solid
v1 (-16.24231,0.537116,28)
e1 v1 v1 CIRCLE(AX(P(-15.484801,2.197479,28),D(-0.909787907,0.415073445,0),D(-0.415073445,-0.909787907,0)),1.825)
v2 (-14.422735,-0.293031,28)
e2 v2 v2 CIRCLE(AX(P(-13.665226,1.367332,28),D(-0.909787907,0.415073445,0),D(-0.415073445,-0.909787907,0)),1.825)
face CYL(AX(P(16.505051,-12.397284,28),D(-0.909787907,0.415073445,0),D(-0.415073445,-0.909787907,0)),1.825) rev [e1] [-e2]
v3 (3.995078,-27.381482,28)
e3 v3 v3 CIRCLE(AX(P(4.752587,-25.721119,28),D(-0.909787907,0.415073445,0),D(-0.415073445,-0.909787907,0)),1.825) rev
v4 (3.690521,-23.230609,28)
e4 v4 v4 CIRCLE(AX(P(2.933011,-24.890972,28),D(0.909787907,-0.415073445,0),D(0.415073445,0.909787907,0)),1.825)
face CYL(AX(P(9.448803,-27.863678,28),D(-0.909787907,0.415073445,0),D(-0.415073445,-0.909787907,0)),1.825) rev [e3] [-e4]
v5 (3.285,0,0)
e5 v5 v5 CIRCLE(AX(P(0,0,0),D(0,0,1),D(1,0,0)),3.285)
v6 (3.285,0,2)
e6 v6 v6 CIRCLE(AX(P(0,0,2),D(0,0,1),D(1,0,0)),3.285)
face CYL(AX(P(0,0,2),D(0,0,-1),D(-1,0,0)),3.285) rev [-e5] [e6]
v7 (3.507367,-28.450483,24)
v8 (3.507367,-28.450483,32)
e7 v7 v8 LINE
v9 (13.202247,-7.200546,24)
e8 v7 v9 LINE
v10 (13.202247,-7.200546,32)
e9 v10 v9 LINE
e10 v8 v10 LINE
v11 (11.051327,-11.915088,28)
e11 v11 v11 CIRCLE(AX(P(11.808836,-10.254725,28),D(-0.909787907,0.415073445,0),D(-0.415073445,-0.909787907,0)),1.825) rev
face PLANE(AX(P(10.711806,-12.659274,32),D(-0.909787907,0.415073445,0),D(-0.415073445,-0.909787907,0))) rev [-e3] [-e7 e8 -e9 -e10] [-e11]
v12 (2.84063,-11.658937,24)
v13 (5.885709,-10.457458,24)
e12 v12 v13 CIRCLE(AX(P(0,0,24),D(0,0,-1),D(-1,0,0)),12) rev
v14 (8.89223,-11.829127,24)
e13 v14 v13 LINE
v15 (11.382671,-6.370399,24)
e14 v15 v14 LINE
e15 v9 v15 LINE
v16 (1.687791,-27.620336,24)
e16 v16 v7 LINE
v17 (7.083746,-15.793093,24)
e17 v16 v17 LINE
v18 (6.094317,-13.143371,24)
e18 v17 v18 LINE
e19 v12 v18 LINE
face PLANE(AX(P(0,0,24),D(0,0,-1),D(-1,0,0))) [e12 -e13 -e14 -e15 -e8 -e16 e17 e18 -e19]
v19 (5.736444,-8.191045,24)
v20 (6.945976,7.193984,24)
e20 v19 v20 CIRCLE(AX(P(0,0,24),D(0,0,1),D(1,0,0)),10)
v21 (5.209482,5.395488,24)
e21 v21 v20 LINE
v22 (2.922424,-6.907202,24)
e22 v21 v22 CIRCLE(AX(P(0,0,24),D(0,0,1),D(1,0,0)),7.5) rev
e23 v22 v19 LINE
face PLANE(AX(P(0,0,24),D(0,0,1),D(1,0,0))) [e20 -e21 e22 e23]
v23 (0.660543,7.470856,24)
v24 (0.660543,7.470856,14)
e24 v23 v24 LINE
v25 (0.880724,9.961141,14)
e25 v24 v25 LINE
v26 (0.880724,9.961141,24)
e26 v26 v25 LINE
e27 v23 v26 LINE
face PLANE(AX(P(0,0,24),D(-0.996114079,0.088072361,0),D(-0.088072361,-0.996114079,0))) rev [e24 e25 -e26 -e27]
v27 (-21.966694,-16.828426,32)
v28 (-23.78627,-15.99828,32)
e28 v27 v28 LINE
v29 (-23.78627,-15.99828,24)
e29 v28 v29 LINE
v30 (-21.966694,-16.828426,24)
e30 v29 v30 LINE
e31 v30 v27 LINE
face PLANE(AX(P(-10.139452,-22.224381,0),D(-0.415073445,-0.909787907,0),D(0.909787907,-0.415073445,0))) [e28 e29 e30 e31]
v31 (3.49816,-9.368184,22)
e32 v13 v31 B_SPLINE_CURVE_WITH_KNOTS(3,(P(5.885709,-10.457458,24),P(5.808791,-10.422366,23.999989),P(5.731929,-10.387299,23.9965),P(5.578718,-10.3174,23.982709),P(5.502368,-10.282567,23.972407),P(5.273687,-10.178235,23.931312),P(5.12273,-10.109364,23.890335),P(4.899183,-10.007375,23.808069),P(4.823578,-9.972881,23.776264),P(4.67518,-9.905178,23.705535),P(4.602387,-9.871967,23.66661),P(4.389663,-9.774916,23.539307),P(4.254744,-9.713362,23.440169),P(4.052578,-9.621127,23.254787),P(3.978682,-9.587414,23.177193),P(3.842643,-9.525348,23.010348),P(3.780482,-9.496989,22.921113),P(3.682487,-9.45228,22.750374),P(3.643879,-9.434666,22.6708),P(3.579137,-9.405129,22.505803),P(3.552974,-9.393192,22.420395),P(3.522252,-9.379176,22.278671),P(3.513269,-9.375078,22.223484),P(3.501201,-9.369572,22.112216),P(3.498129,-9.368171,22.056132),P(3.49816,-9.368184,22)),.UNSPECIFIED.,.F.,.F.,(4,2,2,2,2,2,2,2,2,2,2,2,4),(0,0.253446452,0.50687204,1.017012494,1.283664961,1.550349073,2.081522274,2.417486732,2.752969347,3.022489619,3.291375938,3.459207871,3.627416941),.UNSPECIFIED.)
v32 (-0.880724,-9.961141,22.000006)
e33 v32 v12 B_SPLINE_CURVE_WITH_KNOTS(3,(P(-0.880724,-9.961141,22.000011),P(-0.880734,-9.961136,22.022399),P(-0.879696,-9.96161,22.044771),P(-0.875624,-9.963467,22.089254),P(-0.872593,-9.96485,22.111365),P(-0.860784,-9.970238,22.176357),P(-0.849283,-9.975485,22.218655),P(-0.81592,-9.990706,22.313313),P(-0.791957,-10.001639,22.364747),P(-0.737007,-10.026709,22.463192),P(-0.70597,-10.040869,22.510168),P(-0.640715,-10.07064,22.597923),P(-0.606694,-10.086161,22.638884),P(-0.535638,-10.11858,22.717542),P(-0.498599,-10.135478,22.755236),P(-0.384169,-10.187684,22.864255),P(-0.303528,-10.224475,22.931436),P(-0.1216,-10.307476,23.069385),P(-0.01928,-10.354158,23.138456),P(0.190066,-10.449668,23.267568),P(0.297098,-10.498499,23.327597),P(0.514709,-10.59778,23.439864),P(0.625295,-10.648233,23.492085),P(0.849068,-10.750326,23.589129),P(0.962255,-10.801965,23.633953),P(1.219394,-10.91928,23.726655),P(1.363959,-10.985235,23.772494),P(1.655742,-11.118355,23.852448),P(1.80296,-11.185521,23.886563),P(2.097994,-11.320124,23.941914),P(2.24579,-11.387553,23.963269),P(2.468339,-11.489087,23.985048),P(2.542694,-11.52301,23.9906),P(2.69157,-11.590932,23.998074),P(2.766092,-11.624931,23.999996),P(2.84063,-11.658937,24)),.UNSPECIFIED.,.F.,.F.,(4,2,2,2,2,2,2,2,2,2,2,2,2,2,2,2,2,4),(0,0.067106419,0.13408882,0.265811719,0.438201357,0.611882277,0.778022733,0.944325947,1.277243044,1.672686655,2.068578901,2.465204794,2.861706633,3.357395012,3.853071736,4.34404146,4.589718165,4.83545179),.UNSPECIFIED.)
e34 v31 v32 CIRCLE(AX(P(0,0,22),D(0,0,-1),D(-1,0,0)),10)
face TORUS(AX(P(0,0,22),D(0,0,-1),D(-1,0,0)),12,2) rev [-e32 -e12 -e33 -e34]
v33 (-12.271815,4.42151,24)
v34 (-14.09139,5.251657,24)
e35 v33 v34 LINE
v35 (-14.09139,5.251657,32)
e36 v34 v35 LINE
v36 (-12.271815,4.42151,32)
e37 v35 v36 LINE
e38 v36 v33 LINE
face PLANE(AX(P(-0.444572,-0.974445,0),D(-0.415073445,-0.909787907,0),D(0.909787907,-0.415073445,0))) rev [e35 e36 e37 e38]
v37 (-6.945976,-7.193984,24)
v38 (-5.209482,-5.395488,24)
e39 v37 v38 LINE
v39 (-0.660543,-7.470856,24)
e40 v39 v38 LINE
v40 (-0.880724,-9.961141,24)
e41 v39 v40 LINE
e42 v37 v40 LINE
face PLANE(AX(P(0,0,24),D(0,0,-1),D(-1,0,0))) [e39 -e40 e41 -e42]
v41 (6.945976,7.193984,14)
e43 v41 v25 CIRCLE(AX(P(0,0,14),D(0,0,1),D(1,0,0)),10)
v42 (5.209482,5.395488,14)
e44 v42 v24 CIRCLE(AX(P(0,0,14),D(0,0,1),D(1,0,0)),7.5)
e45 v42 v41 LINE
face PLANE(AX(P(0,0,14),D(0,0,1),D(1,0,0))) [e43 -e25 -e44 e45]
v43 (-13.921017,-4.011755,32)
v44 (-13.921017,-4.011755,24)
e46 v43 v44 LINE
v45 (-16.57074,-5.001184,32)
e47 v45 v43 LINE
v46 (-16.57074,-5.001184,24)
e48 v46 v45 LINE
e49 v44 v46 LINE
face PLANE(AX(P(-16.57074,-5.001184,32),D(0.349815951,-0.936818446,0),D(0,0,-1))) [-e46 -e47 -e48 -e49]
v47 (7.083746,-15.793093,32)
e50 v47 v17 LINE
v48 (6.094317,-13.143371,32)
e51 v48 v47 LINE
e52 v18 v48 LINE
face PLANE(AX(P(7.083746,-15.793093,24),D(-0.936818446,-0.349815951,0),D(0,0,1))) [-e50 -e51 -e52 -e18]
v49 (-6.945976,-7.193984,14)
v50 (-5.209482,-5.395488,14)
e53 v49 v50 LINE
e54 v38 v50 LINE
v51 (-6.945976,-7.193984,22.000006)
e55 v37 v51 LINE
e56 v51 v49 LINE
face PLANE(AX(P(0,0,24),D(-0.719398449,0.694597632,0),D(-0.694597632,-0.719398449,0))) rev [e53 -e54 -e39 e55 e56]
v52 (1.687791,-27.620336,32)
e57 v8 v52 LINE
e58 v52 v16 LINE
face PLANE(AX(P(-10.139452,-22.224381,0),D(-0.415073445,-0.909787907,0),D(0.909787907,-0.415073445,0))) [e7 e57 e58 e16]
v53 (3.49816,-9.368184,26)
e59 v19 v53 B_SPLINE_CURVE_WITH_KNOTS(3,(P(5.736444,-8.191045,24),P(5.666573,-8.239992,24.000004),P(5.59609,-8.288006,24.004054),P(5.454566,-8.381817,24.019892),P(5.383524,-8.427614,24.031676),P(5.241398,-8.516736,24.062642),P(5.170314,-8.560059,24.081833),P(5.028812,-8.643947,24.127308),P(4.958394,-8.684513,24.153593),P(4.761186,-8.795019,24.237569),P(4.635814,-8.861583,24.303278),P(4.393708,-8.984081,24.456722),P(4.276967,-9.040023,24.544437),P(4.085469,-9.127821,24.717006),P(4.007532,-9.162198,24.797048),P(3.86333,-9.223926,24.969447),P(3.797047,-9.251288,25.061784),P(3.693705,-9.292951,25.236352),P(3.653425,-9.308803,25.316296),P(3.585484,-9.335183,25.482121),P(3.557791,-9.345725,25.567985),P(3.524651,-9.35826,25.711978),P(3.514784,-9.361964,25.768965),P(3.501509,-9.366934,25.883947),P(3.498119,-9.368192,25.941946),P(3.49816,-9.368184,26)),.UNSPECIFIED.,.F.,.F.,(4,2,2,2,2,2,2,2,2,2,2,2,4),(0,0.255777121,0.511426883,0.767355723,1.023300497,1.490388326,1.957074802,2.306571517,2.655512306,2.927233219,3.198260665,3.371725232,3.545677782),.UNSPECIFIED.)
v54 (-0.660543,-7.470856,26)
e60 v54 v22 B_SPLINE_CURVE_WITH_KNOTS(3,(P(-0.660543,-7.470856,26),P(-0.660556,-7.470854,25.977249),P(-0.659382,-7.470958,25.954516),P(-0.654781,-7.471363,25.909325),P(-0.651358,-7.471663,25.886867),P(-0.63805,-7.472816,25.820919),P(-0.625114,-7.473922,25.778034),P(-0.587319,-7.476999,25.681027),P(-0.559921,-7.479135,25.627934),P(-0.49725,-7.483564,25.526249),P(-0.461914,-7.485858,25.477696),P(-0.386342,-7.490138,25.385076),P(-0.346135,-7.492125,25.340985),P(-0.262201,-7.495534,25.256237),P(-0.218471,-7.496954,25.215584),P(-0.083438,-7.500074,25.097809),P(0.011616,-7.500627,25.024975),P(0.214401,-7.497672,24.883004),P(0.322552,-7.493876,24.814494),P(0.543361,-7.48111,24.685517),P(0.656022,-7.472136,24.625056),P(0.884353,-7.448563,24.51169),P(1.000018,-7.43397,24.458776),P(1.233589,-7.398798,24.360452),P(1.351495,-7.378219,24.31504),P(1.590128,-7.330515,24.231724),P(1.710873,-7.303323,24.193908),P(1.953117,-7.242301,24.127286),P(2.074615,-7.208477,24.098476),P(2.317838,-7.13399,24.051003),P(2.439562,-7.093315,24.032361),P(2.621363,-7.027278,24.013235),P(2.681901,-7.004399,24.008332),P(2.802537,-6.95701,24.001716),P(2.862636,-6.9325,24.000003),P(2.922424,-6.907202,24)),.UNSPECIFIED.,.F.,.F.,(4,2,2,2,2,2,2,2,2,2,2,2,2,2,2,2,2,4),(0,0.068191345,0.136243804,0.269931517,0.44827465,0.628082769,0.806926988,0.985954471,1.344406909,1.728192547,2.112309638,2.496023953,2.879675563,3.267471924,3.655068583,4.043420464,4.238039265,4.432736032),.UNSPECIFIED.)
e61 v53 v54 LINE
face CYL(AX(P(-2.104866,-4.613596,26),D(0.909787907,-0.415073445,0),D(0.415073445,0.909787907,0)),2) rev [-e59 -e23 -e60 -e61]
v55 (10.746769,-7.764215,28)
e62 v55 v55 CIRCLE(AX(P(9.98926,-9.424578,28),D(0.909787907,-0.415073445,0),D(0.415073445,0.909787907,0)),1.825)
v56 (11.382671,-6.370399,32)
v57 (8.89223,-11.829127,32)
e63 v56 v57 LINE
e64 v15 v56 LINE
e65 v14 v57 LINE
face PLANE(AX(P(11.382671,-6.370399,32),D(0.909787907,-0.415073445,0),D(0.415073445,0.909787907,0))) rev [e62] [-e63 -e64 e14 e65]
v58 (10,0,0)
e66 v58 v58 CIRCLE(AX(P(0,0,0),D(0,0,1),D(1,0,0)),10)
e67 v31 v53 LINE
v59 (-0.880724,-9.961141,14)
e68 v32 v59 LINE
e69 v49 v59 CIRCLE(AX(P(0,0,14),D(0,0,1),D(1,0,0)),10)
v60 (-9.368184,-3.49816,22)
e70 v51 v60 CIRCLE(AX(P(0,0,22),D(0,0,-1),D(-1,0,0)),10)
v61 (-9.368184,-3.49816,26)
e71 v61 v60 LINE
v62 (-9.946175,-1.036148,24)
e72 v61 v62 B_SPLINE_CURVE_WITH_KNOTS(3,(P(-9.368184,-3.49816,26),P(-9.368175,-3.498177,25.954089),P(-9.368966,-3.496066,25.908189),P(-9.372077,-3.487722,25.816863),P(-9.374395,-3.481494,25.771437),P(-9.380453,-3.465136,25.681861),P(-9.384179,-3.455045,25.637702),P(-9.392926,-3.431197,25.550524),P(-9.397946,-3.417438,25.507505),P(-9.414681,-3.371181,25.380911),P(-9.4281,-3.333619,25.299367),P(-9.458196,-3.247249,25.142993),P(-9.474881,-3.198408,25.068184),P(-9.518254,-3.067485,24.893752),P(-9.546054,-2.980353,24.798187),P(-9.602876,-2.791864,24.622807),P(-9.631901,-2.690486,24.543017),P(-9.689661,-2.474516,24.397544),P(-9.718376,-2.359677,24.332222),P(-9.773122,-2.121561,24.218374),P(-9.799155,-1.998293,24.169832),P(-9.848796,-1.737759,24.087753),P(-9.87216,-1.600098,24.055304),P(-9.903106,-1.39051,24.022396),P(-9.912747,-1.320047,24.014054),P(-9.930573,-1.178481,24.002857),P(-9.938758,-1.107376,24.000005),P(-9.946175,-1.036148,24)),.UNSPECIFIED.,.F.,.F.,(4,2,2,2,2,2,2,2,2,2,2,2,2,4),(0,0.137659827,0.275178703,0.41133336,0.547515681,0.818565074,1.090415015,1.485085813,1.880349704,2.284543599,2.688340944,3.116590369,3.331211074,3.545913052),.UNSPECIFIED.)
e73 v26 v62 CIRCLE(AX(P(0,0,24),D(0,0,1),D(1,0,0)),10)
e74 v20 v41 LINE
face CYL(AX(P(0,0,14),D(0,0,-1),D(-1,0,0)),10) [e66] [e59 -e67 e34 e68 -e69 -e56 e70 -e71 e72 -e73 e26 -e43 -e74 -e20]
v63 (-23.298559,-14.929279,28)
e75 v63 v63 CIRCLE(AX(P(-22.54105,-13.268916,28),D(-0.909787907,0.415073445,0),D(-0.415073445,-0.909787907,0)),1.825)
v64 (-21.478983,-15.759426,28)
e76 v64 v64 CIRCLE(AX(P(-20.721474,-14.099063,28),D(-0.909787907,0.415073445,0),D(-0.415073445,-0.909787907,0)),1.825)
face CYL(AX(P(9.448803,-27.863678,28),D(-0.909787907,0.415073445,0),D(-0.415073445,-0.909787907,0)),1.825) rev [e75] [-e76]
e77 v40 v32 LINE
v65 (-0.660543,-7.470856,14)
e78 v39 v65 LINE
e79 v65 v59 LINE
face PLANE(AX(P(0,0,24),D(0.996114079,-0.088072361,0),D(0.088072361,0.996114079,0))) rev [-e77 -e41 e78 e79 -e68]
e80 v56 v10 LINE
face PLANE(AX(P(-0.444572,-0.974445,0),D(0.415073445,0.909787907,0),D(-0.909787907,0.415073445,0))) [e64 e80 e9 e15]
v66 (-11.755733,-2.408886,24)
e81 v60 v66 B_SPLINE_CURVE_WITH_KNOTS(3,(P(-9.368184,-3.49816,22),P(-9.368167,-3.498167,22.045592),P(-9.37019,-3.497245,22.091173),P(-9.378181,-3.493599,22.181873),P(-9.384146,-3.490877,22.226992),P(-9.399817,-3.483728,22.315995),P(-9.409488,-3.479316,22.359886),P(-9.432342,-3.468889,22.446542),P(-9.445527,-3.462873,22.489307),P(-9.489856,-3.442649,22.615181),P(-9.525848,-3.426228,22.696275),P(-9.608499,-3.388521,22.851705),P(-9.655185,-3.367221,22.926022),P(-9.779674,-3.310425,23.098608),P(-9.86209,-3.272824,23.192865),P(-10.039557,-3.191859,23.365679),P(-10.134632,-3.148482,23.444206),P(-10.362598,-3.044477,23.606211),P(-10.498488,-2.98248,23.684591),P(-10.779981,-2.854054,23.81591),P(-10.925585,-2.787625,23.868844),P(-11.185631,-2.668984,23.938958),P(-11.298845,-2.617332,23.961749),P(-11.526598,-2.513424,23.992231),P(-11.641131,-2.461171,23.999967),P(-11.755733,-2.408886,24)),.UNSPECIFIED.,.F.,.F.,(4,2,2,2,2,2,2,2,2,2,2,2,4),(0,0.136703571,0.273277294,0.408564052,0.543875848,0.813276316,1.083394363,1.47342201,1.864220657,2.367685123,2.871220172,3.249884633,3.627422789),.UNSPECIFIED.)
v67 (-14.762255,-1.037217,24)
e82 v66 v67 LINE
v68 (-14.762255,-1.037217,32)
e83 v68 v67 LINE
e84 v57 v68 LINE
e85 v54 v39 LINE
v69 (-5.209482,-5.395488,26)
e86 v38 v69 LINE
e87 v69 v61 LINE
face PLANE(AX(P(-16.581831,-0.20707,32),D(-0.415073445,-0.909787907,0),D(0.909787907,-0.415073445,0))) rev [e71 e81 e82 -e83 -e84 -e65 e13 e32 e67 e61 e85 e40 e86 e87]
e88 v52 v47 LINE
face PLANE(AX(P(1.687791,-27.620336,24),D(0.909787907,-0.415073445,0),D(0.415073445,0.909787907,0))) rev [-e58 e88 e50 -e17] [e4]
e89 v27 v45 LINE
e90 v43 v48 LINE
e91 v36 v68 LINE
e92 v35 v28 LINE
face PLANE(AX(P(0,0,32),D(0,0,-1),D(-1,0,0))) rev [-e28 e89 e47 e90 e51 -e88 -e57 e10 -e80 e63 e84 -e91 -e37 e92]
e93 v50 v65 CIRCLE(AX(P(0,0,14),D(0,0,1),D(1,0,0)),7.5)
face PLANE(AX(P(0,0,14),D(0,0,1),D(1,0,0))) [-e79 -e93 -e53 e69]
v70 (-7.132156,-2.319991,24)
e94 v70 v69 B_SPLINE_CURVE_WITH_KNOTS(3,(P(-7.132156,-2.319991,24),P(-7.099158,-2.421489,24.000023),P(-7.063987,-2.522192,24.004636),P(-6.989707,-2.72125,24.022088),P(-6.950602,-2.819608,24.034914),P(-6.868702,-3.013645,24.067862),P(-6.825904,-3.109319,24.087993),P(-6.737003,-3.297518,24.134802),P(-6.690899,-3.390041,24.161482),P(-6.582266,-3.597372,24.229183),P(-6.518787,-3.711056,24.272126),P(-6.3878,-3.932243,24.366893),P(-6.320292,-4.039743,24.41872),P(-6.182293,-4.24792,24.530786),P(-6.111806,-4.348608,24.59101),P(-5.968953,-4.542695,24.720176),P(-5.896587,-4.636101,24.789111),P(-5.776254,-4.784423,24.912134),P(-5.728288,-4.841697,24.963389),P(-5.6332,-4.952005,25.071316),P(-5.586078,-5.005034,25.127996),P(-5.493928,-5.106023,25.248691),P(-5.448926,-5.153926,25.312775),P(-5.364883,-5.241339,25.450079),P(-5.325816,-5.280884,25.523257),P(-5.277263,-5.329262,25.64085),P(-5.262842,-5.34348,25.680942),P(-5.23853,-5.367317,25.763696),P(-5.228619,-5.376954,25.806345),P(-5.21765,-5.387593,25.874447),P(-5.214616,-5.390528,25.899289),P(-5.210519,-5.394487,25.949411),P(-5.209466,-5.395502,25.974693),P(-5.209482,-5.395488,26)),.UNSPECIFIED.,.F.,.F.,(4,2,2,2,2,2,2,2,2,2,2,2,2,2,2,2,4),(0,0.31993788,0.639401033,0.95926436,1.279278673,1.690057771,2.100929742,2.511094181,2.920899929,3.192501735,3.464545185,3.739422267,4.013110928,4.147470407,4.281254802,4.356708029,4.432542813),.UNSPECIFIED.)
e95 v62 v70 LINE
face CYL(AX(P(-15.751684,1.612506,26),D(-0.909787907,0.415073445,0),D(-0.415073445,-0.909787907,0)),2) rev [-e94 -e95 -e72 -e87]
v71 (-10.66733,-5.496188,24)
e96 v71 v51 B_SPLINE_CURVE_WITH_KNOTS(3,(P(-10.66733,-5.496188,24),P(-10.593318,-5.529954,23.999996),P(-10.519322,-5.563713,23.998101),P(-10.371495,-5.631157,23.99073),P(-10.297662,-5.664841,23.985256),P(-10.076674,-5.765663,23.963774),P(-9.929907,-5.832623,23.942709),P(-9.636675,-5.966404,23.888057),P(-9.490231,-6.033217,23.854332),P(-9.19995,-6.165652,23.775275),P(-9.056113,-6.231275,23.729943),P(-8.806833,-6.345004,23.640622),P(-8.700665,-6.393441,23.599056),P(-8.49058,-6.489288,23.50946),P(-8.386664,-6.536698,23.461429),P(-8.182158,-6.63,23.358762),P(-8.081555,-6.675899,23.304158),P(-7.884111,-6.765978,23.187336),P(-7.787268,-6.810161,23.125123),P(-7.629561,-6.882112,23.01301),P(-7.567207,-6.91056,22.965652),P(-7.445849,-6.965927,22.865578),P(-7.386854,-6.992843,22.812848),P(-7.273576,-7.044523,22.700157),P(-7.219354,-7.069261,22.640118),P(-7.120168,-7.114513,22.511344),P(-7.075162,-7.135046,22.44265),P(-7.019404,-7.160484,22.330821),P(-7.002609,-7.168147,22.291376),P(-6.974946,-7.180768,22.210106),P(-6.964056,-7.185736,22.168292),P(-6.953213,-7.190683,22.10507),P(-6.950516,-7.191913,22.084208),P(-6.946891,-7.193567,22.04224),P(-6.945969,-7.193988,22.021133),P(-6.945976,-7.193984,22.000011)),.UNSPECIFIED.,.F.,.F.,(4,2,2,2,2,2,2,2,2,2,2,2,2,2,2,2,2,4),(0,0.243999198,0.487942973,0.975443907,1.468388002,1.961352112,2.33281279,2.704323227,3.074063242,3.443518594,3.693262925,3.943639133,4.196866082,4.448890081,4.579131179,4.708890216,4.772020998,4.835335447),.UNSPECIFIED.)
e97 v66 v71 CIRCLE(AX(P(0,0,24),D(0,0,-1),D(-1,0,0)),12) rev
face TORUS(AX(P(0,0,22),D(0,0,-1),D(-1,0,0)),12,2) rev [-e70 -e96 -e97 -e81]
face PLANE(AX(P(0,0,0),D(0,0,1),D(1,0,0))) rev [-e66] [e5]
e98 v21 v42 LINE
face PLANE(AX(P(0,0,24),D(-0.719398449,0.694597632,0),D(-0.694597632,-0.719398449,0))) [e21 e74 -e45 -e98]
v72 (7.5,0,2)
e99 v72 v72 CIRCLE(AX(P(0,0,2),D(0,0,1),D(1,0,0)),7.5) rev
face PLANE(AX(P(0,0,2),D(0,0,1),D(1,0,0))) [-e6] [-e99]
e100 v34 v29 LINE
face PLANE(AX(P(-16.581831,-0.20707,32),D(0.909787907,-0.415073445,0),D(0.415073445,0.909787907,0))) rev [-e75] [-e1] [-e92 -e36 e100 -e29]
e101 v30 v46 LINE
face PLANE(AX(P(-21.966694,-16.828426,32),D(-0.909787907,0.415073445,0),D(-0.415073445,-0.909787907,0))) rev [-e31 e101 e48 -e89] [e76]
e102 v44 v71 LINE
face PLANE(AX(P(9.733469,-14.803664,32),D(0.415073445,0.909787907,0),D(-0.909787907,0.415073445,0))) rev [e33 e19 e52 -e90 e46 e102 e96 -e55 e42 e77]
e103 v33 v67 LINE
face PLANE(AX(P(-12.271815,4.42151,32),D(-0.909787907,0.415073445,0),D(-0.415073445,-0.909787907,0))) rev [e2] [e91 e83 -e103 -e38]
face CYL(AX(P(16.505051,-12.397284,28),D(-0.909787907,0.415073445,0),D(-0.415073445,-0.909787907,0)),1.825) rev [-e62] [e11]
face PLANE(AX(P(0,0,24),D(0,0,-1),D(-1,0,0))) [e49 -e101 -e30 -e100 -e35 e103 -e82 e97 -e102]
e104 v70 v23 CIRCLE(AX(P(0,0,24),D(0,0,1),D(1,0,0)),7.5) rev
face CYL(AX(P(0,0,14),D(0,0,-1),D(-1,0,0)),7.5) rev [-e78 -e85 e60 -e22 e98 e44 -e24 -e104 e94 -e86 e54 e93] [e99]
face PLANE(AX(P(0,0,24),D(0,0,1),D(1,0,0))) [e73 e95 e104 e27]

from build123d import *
from build123d.topology import SkipClean

# Parameters (mm, degrees)
SKETCH1_R           = 7.5
SKETCH1_R_2         = 3.285
BOSS_EXTRUDE1_DEPTH = 2
SKETCH1_3_R         = 10
SKETCH1_3_R_2       = 7.5
BOSS_EXTRUDE2_DEPTH = 14
BOSS_EXTRUDE3_DEPTH = 10
BOSS_EXTRUDE4_DEPTH = 8
FILLET1_R           = 2
FILLET2_R           = 2
SKETCH4_W           = 2
SKETCH4_H           = 8
BOSS_EXTRUDE5_DEPTH = 15
CHAMFER1_SIZE       = 2
CUT_EXTRUDE1_REACH  = 55.102
SKETCH6_R           = 1.825
SKETCH7_W           = 2
SKETCH7_H           = 8
BOSS_EXTRUDE6_DEPTH = 6
CUT_EXTRUDE2_REACH  = 56.289
SKETCH8_R           = 1.825


with BuildPart() as part:
    # Sketch1 → Boss-Extrude1 (new body)
    with BuildSketch(Plane.XY):
        Circle(SKETCH1_R)
        Circle(SKETCH1_R_2, mode=Mode.SUBTRACT)
    extrude(amount=BOSS_EXTRUDE1_DEPTH)

    # Sketch1<3> → Boss-Extrude2 (add)
    with BuildSketch(Plane.XY):
        Circle(SKETCH1_3_R)
        Circle(SKETCH1_3_R_2, mode=Mode.SUBTRACT)
    extrude(amount=BOSS_EXTRUDE2_DEPTH)

    # Sketch2 → Boss-Extrude3 (add)
    with SkipClean():  # the faces are left unmerged after this step: merging them gives an invalid solid
        with BuildSketch(Plane.XY.offset(14)):
            with BuildLine():
                ThreePointArc((0.880723614, 9.961140794), (-9.097879067, 4.150734451), (-6.945976325, -7.193984493))
                Line((-6.945976325, -7.193984493), (-5.209482244, -5.39548837))
                ThreePointArc((-5.209482244, -5.39548837), (-6.8234093, 3.113050838), (0.66054271, 7.470855595))
                Line((0.66054271, 7.470855595), (0.880723614, 9.961140794))
            make_face()
            with BuildLine():
                Line((-0.66054271, -7.470855595), (-0.880723614, -9.961140794))
                ThreePointArc((-0.880723614, -9.961140794), (6.752509306, -7.375880833), (10, 0))
                ThreePointArc((10, 0), (9.204883575, 3.907699883), (6.945976325, 7.193984493))
                Line((6.945976325, 7.193984493), (5.209482244, 5.39548837))
                ThreePointArc((5.209482244, 5.39548837), (6.903662681, 2.930774912), (7.5, 0))
                ThreePointArc((7.5, 0), (5.06438198, -5.531910625), (-0.66054271, -7.470855595))
            make_face()
        extrude(amount=BOSS_EXTRUDE3_DEPTH)

    # Sketch3 → Boss-Extrude4 (add)
    with SkipClean():  # the faces are left unmerged after this step: merging them gives an invalid solid
        with BuildSketch(Plane.XY.offset(24)):
            Polygon((10.711806124, -12.659273659), (9.733468631, -14.80366432), (-17.56016857, -2.351460968), (-16.581831078, -0.207070307), align=None)
        extrude(amount=BOSS_EXTRUDE4_DEPTH)

    # Fillet1
    # the kernel refuses this fillet: 2 mm, written as the material it adds along each edge
    with BuildSketch(Plane(origin=(-5.209482244, -5.39548837, 24), x_dir=(0.4150734450654639, 0.9097879067131457, 0), z_dir=(0.9097879067131457, -0.41507344506546395, 0))) as fillet1_piece_1_section:
        with BuildLine():
            CenterArc((FILLET1_R, FILLET1_R), FILLET1_R, 180, 90)
            Line((0, FILLET1_R), (0, 0))
            Line((0, 0), (FILLET1_R, 0))
        make_face()
    fillet1_piece_1 = extrude(amount=14.571067812, mode=Mode.PRIVATE)
    fillet1_piece_1 = fillet1_piece_1 & Plane(origin=(0, 0, 24.466684855), x_dir=(-0.08807236135728662, -0.9961140793929938, 0), z_dir=(0, 0, -1)) * Cylinder(10, 38, mode=Mode.PRIVATE)
    fillet1_piece_1 = fillet1_piece_1 - Plane(origin=(0, 0, 24.466684855), x_dir=(0.6945976324993828, 0.7193984493493522, 0), z_dir=(0, 0, -1)) * Cylinder(7.5, 38, mode=Mode.PRIVATE)
    add(fillet1_piece_1)
    with BuildSketch(Plane(origin=(-13.917123993, -1.42279228, 24), x_dir=(0.4150734450654639, 0.9097879067131457, 0), z_dir=(0.9097879067131457, -0.41507344506546395, 0))) as fillet1_piece_2_section:
        with BuildLine():
            CenterArc((FILLET1_R, FILLET1_R), FILLET1_R, 180, 90)
            Line((0, FILLET1_R), (0, 0))
            Line((0, 0), (FILLET1_R, 0))
        make_face()
    fillet1_piece_2 = extrude(amount=14.571067812, mode=Mode.PRIVATE)
    fillet1_piece_2 = fillet1_piece_2 & Plane(origin=(0, 0, 24.466680249), x_dir=(0.08807236135728662, 0.9961140793929938, 0), z_dir=(0, 0, -1)) * Cylinder(10, 38, mode=Mode.PRIVATE)
    fillet1_piece_2 = fillet1_piece_2 - Plane(origin=(0, 0, 24.466680249), x_dir=(0.6945976324993828, 0.7193984493493522, 0), z_dir=(0, 0, -1)) * Cylinder(7.5, 38, mode=Mode.PRIVATE)
    add(fillet1_piece_2)

    # Fillet2
    # the kernel refuses this fillet: 2 mm, written as the material it adds along each edge
    with BuildSketch(Plane(origin=(0, 0, 24), x_dir=(-0.9898439357335846, 0.14215830222483344, 0), z_dir=(0.14215830222483344, 0.9898439357335846, 0))) as fillet2_piece_1_section:
        with BuildLine():
            CenterArc((10 + FILLET2_R, -FILLET2_R), FILLET2_R, 90, 90)
            Line((10 + FILLET2_R, 0), (10, 0))
            Line((10, 0), (10, -FILLET2_R))
        make_face()
    fillet2_piece_1 = revolve(axis=Axis((0, 0, 24), (0, 0, 1)), revolution_arc=82.826410261, mode=Mode.PRIVATE)
    fillet2_piece_1 = split(fillet2_piece_1, bisect_by=Plane(origin=(-8.477218422, -3.904645831, 23.537511225), z_dir=(-0.41507344506546395, -0.9097879067131457, 0)), keep=Keep.TOP, mode=Mode.PRIVATE)
    fillet2_piece_1 = split(fillet2_piece_1, bisect_by=Plane(origin=(-9.455555915, -6.049036492, 23.537511225), z_dir=(0.41507344506546395, 0.9097879067131456, 0)), keep=Keep.TOP, mode=Mode.PRIVATE)
    add(fillet2_piece_1)
    with BuildSketch(Plane(origin=(0, 0, 24), x_dir=(0.7561376391606037, -0.6544126149797455, 0), z_dir=(0.6544126149797455, 0.7561376391606037, 0))) as fillet2_piece_2_section:
        with BuildLine():
            CenterArc((10 + FILLET2_R, FILLET2_R), FILLET2_R, 180, 90)
            Line((10 + FILLET2_R, 0), (10, 0))
            Line((10, 0), (10, FILLET2_R))
        make_face()
    fillet2_piece_2 = revolve(axis=Axis((0, 0, 24), (0, 0, -1)), revolution_arc=82.826410261, mode=Mode.PRIVATE)
    fillet2_piece_2 = split(fillet2_piece_2, bisect_by=Plane(origin=(2.607194883, -8.96169878, 23.537511389), z_dir=(-0.41507344506546395, -0.9097879067131457, 0)), keep=Keep.TOP, mode=Mode.PRIVATE)
    fillet2_piece_2 = split(fillet2_piece_2, bisect_by=Plane(origin=(1.628857391, -11.106089441, 23.537511389), z_dir=(0.41507344506546395, 0.9097879067131456, 0)), keep=Keep.TOP, mode=Mode.PRIVATE)
    add(fillet2_piece_2)

    # Sketch4 → Boss-Extrude5 (add)
    with BuildSketch(Plane(origin=(-3.913349969, -8.577562644, 0), x_dir=(0.9097879067131455, -0.4150734450654641, 0), z_dir=(-0.4150734450654641, -0.9097879067131455, 0))):
        with Locations((-14, 28)):
            Rectangle(SKETCH4_W, SKETCH4_H)
        with Locations((14, 28)):
            Rectangle(SKETCH4_W, SKETCH4_H)
    extrude(amount=BOSS_EXTRUDE5_DEPTH)

    # Chamfer1
    chamfer1_edges = [part.edges().sort_by_distance(p)[0] for p in [
        (-15.740592757, -3.181607858, 28),
        (7.913892818, -13.97351743, 28),
    ]]
    chamfer(chamfer1_edges, length=CHAMFER1_SIZE)

    # Cut-Extrude1: up to this face of the body (flat: up to its plane)
    cut_extrude1_end = Plane(part.part.faces().sort_by_distance((7.10958654, -20.55487829, 28))[0])
    # Sketch6 → Cut-Extrude1 (cut, up to the picked face)
    with BuildSketch(Plane(origin=(-13.646818601, 6.226101676, 0), x_dir=(0, 0, 1), z_dir=(-0.9097879067131456, 0.41507344506546384, 0)), mode=Mode.PRIVATE) as cut_extrude1_sk1:
        with Locations(Location((28, -21.428090416, 0), (0, 0, 270))):
            Circle(SKETCH6_R)
    cut_extrude1_tool1 = split(extrude(cut_extrude1_sk1.sketch, amount=-CUT_EXTRUDE1_REACH, mode=Mode.PRIVATE), bisect_by=cut_extrude1_end, keep=Keep.BOTH, mode=Mode.PRIVATE)
    add(cut_extrude1_tool1.solids().sort_by(Axis((-22.54105, -13.268916, 28), (0.9097879067131456, -0.41507344506546384, 0)))[0], mode=Mode.SUBTRACT)

    # Sketch7 → Boss-Extrude6 (add)
    with BuildSketch(Plane(origin=(-2.935012477, -6.433171983, 0), x_dir=(0.9097879067131457, -0.4150734450654639, 0), z_dir=(0.41507344506546384, 0.9097879067131456, 0))):
        with Locations((14, -28)):
            Rectangle(SKETCH7_W, SKETCH7_H)
        with Locations((-14, -28)):
            Rectangle(SKETCH7_W, SKETCH7_H)
    extrude(amount=BOSS_EXTRUDE6_DEPTH)

    # Cut-Extrude2: up to this face of the body (flat: up to its plane)
    cut_extrude2_end = Plane(part.part.faces().sort_by_distance((7.301672081, -20.133851349, 28))[0])
    # Sketch8 → Cut-Extrude2 (cut, up to the picked face)
    with BuildSketch(Plane(origin=(-13.646818601, 6.226101676, 0), x_dir=(0, 0, 1), z_dir=(-0.9097879067131456, 0.4150734450654639, 0)), mode=Mode.PRIVATE) as cut_extrude2_sk1:
        with Locations(Location((28, -4.428090416, 0), (0, 0, 270))):
            Circle(SKETCH8_R)
    cut_extrude2_tool1 = split(extrude(cut_extrude2_sk1.sketch, amount=-CUT_EXTRUDE2_REACH, mode=Mode.PRIVATE), bisect_by=cut_extrude2_end, keep=Keep.BOTH, mode=Mode.PRIVATE)
    add(cut_extrude2_tool1.solids().sort_by(Axis((-15.484801, 2.197479, 28), (0.9097879067131456, -0.4150734450654639, 0)))[0], mode=Mode.SUBTRACT)


solid = part.part
